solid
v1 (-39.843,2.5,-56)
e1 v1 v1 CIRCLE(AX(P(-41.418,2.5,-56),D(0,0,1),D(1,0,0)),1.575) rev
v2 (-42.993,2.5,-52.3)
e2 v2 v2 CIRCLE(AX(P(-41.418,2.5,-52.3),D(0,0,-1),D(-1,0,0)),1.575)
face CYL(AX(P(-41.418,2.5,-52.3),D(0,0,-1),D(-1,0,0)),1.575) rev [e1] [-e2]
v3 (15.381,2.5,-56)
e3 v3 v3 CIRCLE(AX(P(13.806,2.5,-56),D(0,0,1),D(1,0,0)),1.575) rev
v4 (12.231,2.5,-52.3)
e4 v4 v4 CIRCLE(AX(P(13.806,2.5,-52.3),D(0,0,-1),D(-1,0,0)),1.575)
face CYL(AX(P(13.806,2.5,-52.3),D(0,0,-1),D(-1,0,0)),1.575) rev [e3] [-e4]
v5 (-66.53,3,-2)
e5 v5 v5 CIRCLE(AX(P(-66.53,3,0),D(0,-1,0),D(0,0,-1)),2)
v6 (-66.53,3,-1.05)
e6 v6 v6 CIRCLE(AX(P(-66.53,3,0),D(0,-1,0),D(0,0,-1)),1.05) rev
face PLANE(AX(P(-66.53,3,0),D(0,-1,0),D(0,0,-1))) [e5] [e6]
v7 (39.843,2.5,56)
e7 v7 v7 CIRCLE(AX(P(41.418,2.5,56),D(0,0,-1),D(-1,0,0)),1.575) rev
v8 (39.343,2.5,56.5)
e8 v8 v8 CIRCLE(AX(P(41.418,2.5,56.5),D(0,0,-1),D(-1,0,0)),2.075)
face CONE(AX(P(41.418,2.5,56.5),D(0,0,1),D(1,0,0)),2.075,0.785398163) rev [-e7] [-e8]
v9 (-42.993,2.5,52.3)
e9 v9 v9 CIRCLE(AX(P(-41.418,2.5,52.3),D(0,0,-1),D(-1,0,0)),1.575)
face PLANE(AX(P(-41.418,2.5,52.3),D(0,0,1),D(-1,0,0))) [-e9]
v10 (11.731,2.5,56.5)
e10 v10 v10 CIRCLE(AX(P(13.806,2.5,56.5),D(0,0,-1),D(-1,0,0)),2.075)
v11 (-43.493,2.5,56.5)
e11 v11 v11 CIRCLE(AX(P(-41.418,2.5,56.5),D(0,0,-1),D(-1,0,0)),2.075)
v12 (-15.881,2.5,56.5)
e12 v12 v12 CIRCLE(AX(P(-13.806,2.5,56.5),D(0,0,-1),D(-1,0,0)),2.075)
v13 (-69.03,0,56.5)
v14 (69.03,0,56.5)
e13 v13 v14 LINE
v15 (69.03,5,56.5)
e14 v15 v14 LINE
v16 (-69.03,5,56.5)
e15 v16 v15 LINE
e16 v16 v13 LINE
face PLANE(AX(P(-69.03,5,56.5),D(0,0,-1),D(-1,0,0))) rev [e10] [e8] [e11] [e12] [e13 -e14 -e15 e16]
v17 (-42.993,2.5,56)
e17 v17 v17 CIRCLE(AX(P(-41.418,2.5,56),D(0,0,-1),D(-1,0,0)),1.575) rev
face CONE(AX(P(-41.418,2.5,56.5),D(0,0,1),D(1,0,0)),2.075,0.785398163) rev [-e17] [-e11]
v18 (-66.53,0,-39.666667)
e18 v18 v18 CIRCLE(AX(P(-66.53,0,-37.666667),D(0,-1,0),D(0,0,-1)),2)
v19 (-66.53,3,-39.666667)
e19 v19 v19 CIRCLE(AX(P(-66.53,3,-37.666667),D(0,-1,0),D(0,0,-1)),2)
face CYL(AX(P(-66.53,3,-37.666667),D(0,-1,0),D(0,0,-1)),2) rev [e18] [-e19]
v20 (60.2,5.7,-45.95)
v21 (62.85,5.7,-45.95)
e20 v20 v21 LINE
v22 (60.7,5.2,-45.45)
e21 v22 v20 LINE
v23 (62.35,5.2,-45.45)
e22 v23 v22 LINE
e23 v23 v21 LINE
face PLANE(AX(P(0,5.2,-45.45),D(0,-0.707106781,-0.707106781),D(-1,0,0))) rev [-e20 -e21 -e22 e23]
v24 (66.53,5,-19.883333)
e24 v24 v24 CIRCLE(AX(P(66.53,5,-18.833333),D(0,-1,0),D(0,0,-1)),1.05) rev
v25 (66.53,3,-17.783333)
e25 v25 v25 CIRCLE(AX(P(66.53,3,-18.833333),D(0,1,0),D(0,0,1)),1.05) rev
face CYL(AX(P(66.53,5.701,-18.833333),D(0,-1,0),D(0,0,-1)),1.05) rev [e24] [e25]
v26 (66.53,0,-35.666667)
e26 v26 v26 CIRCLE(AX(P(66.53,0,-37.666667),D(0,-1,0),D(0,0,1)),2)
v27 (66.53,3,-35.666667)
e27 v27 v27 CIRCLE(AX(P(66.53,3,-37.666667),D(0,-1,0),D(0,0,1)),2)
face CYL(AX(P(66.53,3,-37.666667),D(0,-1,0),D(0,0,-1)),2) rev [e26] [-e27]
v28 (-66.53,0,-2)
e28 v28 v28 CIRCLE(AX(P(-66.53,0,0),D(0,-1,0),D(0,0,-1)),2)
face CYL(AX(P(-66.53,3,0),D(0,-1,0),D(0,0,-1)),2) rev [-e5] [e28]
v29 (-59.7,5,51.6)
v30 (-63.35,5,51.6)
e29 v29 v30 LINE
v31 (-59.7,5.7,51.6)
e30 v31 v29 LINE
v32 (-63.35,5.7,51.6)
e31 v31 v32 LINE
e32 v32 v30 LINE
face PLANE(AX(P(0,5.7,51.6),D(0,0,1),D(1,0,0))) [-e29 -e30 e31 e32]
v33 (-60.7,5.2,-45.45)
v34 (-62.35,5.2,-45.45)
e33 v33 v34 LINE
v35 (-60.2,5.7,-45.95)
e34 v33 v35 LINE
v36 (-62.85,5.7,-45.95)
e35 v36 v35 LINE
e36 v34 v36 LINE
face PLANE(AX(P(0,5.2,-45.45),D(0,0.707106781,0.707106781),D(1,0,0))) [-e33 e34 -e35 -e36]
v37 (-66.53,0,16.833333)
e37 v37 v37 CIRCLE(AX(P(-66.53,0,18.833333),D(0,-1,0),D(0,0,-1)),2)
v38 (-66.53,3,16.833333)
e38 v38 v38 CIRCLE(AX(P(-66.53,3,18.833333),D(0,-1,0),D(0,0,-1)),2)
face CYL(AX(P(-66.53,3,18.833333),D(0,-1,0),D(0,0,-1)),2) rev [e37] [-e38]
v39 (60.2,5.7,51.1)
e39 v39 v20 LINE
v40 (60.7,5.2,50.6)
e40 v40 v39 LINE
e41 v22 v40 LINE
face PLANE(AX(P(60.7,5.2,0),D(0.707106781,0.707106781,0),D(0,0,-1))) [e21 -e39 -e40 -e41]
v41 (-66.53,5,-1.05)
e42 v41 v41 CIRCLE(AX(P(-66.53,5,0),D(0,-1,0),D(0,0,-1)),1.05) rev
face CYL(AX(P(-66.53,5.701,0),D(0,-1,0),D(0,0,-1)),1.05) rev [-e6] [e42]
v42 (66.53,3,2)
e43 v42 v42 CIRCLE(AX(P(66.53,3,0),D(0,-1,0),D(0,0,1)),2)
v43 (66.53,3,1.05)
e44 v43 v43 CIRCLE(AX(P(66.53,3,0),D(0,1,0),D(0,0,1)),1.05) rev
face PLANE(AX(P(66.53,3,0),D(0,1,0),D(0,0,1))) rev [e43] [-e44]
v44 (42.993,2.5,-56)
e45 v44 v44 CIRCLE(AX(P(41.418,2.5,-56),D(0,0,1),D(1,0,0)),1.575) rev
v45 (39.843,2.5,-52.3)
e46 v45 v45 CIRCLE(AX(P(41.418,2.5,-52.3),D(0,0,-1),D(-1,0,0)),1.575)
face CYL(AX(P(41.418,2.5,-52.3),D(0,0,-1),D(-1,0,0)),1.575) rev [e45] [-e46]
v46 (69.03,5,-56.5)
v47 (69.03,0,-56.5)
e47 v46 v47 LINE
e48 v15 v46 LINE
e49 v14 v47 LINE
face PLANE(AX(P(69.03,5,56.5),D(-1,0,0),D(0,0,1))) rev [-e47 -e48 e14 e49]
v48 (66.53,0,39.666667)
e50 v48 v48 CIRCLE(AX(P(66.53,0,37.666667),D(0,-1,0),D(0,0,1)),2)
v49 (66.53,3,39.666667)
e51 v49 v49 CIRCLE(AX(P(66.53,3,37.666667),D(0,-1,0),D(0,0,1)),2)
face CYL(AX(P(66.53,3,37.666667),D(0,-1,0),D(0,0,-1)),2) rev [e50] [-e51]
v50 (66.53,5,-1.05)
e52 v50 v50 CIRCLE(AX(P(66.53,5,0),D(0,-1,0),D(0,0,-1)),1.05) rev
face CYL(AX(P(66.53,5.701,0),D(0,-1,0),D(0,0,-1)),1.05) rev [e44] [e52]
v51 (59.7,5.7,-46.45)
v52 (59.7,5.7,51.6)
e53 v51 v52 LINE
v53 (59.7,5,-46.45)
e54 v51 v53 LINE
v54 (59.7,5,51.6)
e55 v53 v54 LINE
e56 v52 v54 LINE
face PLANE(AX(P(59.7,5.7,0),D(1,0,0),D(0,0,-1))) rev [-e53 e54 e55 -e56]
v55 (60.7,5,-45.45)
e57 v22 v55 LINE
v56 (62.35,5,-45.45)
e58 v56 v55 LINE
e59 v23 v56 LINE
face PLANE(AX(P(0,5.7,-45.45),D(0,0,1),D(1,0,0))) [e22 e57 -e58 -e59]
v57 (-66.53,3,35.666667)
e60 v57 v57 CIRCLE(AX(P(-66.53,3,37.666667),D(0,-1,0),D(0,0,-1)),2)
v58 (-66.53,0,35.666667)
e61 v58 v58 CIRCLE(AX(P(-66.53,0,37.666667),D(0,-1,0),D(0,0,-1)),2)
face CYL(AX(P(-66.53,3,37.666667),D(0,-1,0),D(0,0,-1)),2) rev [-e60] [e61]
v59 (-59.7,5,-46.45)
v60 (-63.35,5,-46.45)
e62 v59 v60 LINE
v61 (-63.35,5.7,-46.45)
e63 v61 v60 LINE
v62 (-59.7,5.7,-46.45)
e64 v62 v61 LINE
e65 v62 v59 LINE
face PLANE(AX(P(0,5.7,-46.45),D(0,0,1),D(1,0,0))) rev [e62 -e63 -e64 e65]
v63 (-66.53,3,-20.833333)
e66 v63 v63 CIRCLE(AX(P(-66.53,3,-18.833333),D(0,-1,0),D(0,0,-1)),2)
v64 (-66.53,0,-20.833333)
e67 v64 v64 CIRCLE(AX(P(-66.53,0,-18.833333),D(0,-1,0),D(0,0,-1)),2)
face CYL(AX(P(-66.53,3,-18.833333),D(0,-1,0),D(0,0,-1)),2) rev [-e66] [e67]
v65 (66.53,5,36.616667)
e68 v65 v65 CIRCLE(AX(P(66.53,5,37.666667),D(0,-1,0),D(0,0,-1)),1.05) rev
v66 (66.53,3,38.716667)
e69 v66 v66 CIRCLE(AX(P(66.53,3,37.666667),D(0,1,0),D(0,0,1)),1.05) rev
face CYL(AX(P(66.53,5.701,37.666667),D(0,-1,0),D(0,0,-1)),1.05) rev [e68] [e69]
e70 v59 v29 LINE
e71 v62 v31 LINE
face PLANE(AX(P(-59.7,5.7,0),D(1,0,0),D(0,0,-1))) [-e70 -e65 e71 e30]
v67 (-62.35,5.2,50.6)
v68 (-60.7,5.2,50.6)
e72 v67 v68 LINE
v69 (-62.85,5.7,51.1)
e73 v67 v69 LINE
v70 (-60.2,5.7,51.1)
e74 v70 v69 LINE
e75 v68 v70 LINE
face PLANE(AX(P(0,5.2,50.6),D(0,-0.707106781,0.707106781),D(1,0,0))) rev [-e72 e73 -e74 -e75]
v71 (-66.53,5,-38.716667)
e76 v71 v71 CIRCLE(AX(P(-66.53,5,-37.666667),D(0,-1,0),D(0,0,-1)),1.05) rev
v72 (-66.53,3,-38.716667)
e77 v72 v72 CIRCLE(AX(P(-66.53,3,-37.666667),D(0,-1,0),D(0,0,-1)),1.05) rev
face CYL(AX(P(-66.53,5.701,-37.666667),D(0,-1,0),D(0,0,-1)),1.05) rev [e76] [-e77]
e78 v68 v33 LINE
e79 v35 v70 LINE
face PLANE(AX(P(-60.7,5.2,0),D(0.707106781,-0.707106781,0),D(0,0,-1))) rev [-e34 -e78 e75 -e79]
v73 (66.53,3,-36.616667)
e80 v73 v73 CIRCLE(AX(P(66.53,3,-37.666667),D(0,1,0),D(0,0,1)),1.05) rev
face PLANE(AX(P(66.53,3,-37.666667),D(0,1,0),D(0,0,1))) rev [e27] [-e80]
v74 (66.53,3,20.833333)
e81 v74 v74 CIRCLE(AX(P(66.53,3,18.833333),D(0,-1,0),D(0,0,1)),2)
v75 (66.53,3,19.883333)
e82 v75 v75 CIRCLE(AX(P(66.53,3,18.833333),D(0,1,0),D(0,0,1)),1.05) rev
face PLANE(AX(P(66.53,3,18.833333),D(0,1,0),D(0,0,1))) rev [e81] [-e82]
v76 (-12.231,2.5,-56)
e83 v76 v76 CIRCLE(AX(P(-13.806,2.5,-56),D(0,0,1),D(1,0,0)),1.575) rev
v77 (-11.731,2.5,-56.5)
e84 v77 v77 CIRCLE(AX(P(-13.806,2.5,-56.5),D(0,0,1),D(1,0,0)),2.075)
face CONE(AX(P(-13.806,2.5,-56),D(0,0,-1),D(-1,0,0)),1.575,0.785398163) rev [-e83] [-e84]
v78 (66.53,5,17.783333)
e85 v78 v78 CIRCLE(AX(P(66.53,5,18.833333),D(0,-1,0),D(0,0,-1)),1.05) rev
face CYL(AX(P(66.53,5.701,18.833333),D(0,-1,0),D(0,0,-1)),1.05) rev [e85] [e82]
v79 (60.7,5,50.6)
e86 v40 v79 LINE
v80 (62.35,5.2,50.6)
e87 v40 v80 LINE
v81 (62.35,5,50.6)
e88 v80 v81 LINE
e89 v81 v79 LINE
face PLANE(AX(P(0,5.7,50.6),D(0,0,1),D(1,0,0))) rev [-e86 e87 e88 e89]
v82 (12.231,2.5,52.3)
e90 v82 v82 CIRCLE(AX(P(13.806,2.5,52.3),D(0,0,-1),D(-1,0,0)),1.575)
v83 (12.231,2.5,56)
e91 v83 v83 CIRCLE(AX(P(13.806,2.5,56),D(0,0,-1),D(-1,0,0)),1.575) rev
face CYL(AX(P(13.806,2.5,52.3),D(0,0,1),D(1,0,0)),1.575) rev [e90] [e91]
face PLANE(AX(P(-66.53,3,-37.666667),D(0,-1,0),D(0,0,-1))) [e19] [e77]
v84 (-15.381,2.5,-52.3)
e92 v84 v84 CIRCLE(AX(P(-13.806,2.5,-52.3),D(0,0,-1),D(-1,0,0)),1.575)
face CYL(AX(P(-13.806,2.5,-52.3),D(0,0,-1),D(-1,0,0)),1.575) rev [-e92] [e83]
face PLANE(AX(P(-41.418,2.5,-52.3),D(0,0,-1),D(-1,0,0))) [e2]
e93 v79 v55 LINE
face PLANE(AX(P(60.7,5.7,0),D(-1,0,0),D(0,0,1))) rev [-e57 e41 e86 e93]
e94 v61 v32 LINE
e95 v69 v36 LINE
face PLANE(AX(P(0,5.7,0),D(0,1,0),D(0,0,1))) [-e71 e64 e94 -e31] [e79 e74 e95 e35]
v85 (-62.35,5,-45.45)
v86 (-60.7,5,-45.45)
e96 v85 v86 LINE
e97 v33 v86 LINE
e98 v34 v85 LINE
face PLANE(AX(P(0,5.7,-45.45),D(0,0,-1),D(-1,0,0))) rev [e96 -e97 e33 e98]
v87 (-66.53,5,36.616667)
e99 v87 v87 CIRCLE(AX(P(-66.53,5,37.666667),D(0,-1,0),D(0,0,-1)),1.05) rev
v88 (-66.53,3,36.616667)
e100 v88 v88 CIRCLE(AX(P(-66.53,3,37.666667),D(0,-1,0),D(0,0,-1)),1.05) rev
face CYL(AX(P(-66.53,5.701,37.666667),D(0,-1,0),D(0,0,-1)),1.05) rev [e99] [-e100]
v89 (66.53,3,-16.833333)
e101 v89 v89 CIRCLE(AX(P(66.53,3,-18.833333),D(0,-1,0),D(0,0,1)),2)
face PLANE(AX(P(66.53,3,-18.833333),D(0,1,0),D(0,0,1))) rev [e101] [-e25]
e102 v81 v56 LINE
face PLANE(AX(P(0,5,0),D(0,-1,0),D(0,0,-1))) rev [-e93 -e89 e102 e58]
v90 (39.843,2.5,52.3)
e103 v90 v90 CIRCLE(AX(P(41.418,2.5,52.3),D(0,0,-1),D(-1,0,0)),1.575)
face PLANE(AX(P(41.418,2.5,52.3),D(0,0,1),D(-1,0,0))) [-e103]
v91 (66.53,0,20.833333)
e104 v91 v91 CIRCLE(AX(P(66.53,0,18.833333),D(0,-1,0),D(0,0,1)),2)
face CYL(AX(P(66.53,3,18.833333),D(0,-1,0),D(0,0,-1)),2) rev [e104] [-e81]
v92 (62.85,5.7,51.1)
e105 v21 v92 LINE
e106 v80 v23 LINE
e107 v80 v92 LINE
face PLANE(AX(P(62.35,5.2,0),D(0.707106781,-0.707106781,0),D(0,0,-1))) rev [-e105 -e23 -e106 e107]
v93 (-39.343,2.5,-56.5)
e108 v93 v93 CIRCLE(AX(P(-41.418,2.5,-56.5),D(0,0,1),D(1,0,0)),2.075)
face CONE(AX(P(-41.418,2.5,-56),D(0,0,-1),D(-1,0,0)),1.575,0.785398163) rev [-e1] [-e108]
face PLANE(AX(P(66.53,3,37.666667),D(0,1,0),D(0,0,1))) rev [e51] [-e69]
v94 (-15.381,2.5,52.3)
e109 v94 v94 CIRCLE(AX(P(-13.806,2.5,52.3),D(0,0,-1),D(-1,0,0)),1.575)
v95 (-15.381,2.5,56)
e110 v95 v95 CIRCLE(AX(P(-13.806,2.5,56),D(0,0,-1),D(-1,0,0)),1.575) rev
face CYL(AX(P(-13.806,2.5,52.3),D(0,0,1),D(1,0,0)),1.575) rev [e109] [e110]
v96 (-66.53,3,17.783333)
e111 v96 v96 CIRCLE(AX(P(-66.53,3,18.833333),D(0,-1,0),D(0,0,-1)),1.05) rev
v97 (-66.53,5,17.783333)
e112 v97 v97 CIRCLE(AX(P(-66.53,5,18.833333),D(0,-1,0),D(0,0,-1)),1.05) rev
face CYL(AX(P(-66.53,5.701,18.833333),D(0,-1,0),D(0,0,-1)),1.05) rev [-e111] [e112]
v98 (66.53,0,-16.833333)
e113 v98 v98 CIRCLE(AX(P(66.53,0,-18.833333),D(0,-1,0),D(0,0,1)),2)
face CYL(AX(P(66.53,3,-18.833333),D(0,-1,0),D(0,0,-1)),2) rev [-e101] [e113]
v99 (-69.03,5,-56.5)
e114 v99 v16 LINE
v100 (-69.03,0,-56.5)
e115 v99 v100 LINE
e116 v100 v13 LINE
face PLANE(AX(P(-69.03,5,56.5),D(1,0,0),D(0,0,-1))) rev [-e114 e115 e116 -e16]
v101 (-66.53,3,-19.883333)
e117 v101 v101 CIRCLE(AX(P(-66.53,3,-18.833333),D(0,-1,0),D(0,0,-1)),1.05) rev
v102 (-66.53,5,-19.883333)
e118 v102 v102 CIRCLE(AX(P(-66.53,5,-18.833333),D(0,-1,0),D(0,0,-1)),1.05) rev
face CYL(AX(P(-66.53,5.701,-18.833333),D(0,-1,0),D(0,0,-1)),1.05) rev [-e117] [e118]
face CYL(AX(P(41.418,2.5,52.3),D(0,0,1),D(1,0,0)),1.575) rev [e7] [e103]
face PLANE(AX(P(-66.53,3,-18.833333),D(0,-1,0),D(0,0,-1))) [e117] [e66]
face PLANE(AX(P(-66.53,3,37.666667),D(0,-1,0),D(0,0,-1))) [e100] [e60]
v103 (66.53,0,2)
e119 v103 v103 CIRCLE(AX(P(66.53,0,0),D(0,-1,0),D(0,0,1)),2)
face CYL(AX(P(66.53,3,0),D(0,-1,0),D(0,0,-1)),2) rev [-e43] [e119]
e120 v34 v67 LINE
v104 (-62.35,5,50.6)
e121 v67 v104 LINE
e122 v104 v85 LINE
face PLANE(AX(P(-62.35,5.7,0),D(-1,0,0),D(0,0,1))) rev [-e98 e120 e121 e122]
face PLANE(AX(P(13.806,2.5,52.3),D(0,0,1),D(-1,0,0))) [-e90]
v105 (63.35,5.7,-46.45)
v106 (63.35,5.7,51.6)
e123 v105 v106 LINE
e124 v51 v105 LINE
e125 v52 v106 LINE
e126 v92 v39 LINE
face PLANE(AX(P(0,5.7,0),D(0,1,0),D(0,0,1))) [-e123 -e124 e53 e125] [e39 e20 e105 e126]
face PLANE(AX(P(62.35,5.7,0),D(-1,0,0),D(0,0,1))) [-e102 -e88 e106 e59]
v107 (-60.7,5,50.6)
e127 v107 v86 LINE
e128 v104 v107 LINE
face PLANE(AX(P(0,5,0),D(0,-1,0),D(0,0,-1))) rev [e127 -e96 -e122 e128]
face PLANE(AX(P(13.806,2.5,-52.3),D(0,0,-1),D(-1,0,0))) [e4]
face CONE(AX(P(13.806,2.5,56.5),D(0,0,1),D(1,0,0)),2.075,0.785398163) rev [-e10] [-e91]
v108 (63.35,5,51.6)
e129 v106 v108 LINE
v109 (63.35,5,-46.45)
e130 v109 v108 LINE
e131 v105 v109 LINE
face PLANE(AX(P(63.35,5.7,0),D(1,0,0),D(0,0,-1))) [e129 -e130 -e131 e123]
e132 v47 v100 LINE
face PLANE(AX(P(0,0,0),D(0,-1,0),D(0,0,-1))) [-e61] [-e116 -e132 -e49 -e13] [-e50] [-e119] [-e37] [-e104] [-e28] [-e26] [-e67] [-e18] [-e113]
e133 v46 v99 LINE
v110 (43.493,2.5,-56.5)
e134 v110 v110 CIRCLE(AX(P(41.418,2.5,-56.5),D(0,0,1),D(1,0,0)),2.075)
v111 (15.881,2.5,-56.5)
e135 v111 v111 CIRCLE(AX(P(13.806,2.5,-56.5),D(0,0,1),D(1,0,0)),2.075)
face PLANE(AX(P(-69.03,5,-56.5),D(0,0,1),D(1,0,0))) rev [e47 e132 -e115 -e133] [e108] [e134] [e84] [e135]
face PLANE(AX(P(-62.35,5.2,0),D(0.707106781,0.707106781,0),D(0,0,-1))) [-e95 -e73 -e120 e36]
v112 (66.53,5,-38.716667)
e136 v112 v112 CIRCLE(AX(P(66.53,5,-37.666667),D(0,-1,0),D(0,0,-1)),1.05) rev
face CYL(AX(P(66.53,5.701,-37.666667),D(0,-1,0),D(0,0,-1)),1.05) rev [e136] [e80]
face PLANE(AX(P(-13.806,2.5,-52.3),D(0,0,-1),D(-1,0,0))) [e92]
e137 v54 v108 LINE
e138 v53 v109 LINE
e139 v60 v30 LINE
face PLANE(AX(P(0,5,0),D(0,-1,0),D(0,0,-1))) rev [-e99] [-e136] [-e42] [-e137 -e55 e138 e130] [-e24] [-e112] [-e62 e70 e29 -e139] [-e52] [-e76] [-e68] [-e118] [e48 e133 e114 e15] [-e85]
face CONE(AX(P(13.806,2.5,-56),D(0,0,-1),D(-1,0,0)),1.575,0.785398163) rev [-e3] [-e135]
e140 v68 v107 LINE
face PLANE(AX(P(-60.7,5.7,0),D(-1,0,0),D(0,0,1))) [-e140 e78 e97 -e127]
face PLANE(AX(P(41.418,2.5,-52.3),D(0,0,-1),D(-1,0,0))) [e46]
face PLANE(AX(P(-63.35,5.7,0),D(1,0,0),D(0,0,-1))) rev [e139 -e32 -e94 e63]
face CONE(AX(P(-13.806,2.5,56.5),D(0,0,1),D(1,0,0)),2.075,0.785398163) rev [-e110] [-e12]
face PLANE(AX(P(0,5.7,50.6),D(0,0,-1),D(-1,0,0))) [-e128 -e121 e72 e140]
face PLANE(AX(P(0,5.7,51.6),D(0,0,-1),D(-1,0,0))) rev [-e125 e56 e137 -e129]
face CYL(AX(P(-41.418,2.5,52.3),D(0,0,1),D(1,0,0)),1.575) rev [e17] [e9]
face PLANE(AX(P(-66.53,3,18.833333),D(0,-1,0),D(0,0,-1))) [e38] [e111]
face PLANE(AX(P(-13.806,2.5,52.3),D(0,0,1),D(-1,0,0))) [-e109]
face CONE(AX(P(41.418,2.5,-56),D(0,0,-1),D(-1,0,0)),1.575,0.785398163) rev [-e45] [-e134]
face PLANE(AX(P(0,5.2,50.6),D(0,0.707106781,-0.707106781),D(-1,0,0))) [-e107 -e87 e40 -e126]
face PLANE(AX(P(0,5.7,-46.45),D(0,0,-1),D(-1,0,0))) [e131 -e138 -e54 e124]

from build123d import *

# Parameters (mm, degrees)
SKETCH_1_W             = 138.06
SKETCH_1_H             = 113
EXTRUDE_301_DEPTH      = 5
SKETCH_2_W             = 3.65
SKETCH_2_H             = 98.05
SKETCH_2_W_2           = 1.65
SKETCH_2_H_2           = 96.05
EXTRUDE_2092_DEPTH     = 0.7
CHAMFER_2147_SIZE      = 0.5
CHAMFER_2335_SIZE      = 0.5
SKETCH_3_R             = 1.575
CUT_EXTRUDE_2766_DEPTH = 4.2
CUT_EXTRUDE_3301_REACH = 91.386
SKETCH_4_R             = 1.05
SKETCH_5_R             = 2
CUT_EXTRUDE_3811_DEPTH = 3
CHAMFER_3856_SIZE      = 0.5


with BuildPart() as part:
    # Эскиз1 → Extrude 301 (new body)
    with BuildSketch(Plane(origin=(0, 0, 0), x_dir=(1, 0, 0), z_dir=(0, 1, 0))):
        Rectangle(SKETCH_1_W, SKETCH_1_H)
    extrude(amount=EXTRUDE_301_DEPTH)

    # Эскиз2 → Extrude 2092 (add)
    # profile 1 of 2: a face of its own
    with BuildSketch(Plane(origin=(0, 5, 0), x_dir=(1, 0, 0), z_dir=(0, 1, 0))):
        with Locations((-61.525, -2.575)):
            Rectangle(SKETCH_2_W, SKETCH_2_H)
        with Locations((-61.525, -2.575)):
            Rectangle(SKETCH_2_W_2, SKETCH_2_H_2, mode=Mode.SUBTRACT)
    # profile 2 of 2: a face of its own
    with BuildSketch(Plane(origin=(0, 5, 0), x_dir=(1, 0, 0), z_dir=(0, 1, 0))):
        with Locations((61.525, -2.575)):
            Rectangle(SKETCH_2_W, SKETCH_2_H)
        with Locations((61.525, -2.575)):
            Rectangle(SKETCH_2_W_2, SKETCH_2_H_2, mode=Mode.SUBTRACT)
    extrude(amount=EXTRUDE_2092_DEPTH)

    # Chamfer 2147
    chamfer_2147_edges = [part.edges().sort_by_distance(p)[0] for p in [
        (-61.525, 5.7, -45.45),
        (-60.7, 5.7, 2.575),
        (-61.525, 5.7, 50.6),
        (-62.35, 5.7, 2.575),
    ]]
    chamfer(chamfer_2147_edges, length=CHAMFER_2147_SIZE)

    # Chamfer 2335
    chamfer_2335_edges = [part.edges().sort_by_distance(p)[0] for p in [
        (61.525, 5.7, 50.6),
        (60.7, 5.7, 2.575),
        (61.525, 5.7, -45.45),
        (62.35, 5.7, 2.575),
    ]]
    chamfer(chamfer_2335_edges, length=CHAMFER_2335_SIZE)

    # Эскиз3 → Cut-Extrude 2766 (cut)
    with BuildSketch(Plane(origin=(0, 0, -56.5), x_dir=(-1, 0, 0), z_dir=(0, 0, -1))):
        with Locations((-41.418, 2.5)):
            Circle(SKETCH_3_R)
        with Locations((-13.806, 2.5)):
            Circle(SKETCH_3_R)
        with Locations((13.806, 2.5)):
            Circle(SKETCH_3_R)
        with Locations((41.418, 2.5)):
            Circle(SKETCH_3_R)
    cut_extrude_2766 = extrude(amount=-CUT_EXTRUDE_2766_DEPTH, mode=Mode.SUBTRACT)

    # Зеркальное отражение1: Cut-Extrude 2766 across plane
    add(cut_extrude_2766.mirror(Plane(origin=(0, 0, 0), x_dir=(1, 0, 0), z_dir=(0, 0, -1))), mode=Mode.SUBTRACT)

    # Эскиз4 → Cut-Extrude 3301 (cut, up to next)
    with BuildSketch(Plane.XZ, mode=Mode.PRIVATE) as cut_extrude_3301_sk1:
        with Locations((-66.53, 37.666666667)):
            Circle(SKETCH_4_R)
    cut_extrude_3301_tool1 = extrude(cut_extrude_3301_sk1.sketch, amount=-CUT_EXTRUDE_3301_REACH, mode=Mode.PRIVATE) & part.part
    # Эскиз4 → Cut-Extrude 3301 (cut, up to next)
    with BuildSketch(Plane.XZ, mode=Mode.PRIVATE) as cut_extrude_3301_sk2:
        with Locations((-66.53, 18.833333333)):
            Circle(SKETCH_4_R)
    cut_extrude_3301_tool2 = extrude(cut_extrude_3301_sk2.sketch, amount=-CUT_EXTRUDE_3301_REACH, mode=Mode.PRIVATE) & part.part
    # Эскиз4 → Cut-Extrude 3301 (cut, up to next)
    with BuildSketch(Plane.XZ, mode=Mode.PRIVATE) as cut_extrude_3301_sk3:
        with Locations((-66.53, 0)):
            Circle(SKETCH_4_R)
    cut_extrude_3301_tool3 = extrude(cut_extrude_3301_sk3.sketch, amount=-CUT_EXTRUDE_3301_REACH, mode=Mode.PRIVATE) & part.part
    # Эскиз4 → Cut-Extrude 3301 (cut, up to next)
    with BuildSketch(Plane.XZ, mode=Mode.PRIVATE) as cut_extrude_3301_sk4:
        with Locations((-66.53, -18.833333333)):
            Circle(SKETCH_4_R)
    cut_extrude_3301_tool4 = extrude(cut_extrude_3301_sk4.sketch, amount=-CUT_EXTRUDE_3301_REACH, mode=Mode.PRIVATE) & part.part
    # Эскиз4 → Cut-Extrude 3301 (cut, up to next)
    with BuildSketch(Plane.XZ, mode=Mode.PRIVATE) as cut_extrude_3301_sk5:
        with Locations((-66.53, -37.666666667)):
            Circle(SKETCH_4_R)
    cut_extrude_3301_tool5 = extrude(cut_extrude_3301_sk5.sketch, amount=-CUT_EXTRUDE_3301_REACH, mode=Mode.PRIVATE) & part.part
    # Эскиз4 → Cut-Extrude 3301 (cut, up to next)
    with BuildSketch(Plane.XZ, mode=Mode.PRIVATE) as cut_extrude_3301_sk6:
        with Locations((66.53, -37.666666667)):
            Circle(SKETCH_4_R)
    cut_extrude_3301_tool6 = extrude(cut_extrude_3301_sk6.sketch, amount=-CUT_EXTRUDE_3301_REACH, mode=Mode.PRIVATE) & part.part
    # Эскиз4 → Cut-Extrude 3301 (cut, up to next)
    with BuildSketch(Plane.XZ, mode=Mode.PRIVATE) as cut_extrude_3301_sk7:
        with Locations((66.53, -18.833333333)):
            Circle(SKETCH_4_R)
    cut_extrude_3301_tool7 = extrude(cut_extrude_3301_sk7.sketch, amount=-CUT_EXTRUDE_3301_REACH, mode=Mode.PRIVATE) & part.part
    # Эскиз4 → Cut-Extrude 3301 (cut, up to next)
    with BuildSketch(Plane.XZ, mode=Mode.PRIVATE) as cut_extrude_3301_sk8:
        with Locations((66.53, 0)):
            Circle(SKETCH_4_R)
    cut_extrude_3301_tool8 = extrude(cut_extrude_3301_sk8.sketch, amount=-CUT_EXTRUDE_3301_REACH, mode=Mode.PRIVATE) & part.part
    # Эскиз4 → Cut-Extrude 3301 (cut, up to next)
    with BuildSketch(Plane.XZ, mode=Mode.PRIVATE) as cut_extrude_3301_sk9:
        with Locations((66.53, 18.833333333)):
            Circle(SKETCH_4_R)
    cut_extrude_3301_tool9 = extrude(cut_extrude_3301_sk9.sketch, amount=-CUT_EXTRUDE_3301_REACH, mode=Mode.PRIVATE) & part.part
    # Эскиз4 → Cut-Extrude 3301 (cut, up to next)
    with BuildSketch(Plane.XZ, mode=Mode.PRIVATE) as cut_extrude_3301_sk10:
        with Locations((66.53, 37.666666667)):
            Circle(SKETCH_4_R)
    cut_extrude_3301_tool10 = extrude(cut_extrude_3301_sk10.sketch, amount=-CUT_EXTRUDE_3301_REACH, mode=Mode.PRIVATE) & part.part
    add(cut_extrude_3301_tool1.solids().sort_by_distance((-66.53, 0, 37.666667))[0], mode=Mode.SUBTRACT)
    add(cut_extrude_3301_tool2.solids().sort_by_distance((-66.53, 0, 18.833333))[0], mode=Mode.SUBTRACT)
    add(cut_extrude_3301_tool3.solids().sort_by_distance((-66.53, 0, 0))[0], mode=Mode.SUBTRACT)
    add(cut_extrude_3301_tool4.solids().sort_by_distance((-66.53, 0, -18.833333))[0], mode=Mode.SUBTRACT)
    add(cut_extrude_3301_tool5.solids().sort_by_distance((-66.53, 0, -37.666667))[0], mode=Mode.SUBTRACT)
    add(cut_extrude_3301_tool6.solids().sort_by_distance((66.53, 0, -37.666667))[0], mode=Mode.SUBTRACT)
    add(cut_extrude_3301_tool7.solids().sort_by_distance((66.53, 0, -18.833333))[0], mode=Mode.SUBTRACT)
    add(cut_extrude_3301_tool8.solids().sort_by_distance((66.53, 0, 0))[0], mode=Mode.SUBTRACT)
    add(cut_extrude_3301_tool9.solids().sort_by_distance((66.53, 0, 18.833333))[0], mode=Mode.SUBTRACT)
    add(cut_extrude_3301_tool10.solids().sort_by_distance((66.53, 0, 37.666667))[0], mode=Mode.SUBTRACT)

    # Эскиз5 → Cut-Extrude 3811 (cut)
    with BuildSketch(Plane.XZ):
        with Locations((-66.53, 37.666666667)):
            Circle(SKETCH_5_R)
        with Locations((-66.53, 18.833333333)):
            Circle(SKETCH_5_R)
        with Locations((-66.53, 0)):
            Circle(SKETCH_5_R)
        with Locations((-66.53, -18.833333333)):
            Circle(SKETCH_5_R)
        with Locations((-66.53, -37.666666667)):
            Circle(SKETCH_5_R)
        with Locations((66.53, -37.666666667)):
            Circle(SKETCH_5_R)
        with Locations((66.53, -18.833333333)):
            Circle(SKETCH_5_R)
        with Locations((66.53, 0)):
            Circle(SKETCH_5_R)
        with Locations((66.53, 18.833333333)):
            Circle(SKETCH_5_R)
        with Locations((66.53, 37.666666667)):
            Circle(SKETCH_5_R)
    extrude(amount=-CUT_EXTRUDE_3811_DEPTH, mode=Mode.SUBTRACT)

    # Chamfer 3856
    chamfer_3856_edges = [part.edges().sort_by_distance(p)[0] for p in [
        (42.993, 2.5, 56.5),
        (15.381, 2.5, 56.5),
        (-12.231, 2.5, 56.5),
        (-39.843, 2.5, 56.5),
        (-39.843, 2.5, -56.5),
        (-12.231, 2.5, -56.5),
        (15.381, 2.5, -56.5),
        (42.993, 2.5, -56.5),
    ]]
    chamfer(chamfer_3856_edges, length=CHAMFER_3856_SIZE)


solid = part.part
